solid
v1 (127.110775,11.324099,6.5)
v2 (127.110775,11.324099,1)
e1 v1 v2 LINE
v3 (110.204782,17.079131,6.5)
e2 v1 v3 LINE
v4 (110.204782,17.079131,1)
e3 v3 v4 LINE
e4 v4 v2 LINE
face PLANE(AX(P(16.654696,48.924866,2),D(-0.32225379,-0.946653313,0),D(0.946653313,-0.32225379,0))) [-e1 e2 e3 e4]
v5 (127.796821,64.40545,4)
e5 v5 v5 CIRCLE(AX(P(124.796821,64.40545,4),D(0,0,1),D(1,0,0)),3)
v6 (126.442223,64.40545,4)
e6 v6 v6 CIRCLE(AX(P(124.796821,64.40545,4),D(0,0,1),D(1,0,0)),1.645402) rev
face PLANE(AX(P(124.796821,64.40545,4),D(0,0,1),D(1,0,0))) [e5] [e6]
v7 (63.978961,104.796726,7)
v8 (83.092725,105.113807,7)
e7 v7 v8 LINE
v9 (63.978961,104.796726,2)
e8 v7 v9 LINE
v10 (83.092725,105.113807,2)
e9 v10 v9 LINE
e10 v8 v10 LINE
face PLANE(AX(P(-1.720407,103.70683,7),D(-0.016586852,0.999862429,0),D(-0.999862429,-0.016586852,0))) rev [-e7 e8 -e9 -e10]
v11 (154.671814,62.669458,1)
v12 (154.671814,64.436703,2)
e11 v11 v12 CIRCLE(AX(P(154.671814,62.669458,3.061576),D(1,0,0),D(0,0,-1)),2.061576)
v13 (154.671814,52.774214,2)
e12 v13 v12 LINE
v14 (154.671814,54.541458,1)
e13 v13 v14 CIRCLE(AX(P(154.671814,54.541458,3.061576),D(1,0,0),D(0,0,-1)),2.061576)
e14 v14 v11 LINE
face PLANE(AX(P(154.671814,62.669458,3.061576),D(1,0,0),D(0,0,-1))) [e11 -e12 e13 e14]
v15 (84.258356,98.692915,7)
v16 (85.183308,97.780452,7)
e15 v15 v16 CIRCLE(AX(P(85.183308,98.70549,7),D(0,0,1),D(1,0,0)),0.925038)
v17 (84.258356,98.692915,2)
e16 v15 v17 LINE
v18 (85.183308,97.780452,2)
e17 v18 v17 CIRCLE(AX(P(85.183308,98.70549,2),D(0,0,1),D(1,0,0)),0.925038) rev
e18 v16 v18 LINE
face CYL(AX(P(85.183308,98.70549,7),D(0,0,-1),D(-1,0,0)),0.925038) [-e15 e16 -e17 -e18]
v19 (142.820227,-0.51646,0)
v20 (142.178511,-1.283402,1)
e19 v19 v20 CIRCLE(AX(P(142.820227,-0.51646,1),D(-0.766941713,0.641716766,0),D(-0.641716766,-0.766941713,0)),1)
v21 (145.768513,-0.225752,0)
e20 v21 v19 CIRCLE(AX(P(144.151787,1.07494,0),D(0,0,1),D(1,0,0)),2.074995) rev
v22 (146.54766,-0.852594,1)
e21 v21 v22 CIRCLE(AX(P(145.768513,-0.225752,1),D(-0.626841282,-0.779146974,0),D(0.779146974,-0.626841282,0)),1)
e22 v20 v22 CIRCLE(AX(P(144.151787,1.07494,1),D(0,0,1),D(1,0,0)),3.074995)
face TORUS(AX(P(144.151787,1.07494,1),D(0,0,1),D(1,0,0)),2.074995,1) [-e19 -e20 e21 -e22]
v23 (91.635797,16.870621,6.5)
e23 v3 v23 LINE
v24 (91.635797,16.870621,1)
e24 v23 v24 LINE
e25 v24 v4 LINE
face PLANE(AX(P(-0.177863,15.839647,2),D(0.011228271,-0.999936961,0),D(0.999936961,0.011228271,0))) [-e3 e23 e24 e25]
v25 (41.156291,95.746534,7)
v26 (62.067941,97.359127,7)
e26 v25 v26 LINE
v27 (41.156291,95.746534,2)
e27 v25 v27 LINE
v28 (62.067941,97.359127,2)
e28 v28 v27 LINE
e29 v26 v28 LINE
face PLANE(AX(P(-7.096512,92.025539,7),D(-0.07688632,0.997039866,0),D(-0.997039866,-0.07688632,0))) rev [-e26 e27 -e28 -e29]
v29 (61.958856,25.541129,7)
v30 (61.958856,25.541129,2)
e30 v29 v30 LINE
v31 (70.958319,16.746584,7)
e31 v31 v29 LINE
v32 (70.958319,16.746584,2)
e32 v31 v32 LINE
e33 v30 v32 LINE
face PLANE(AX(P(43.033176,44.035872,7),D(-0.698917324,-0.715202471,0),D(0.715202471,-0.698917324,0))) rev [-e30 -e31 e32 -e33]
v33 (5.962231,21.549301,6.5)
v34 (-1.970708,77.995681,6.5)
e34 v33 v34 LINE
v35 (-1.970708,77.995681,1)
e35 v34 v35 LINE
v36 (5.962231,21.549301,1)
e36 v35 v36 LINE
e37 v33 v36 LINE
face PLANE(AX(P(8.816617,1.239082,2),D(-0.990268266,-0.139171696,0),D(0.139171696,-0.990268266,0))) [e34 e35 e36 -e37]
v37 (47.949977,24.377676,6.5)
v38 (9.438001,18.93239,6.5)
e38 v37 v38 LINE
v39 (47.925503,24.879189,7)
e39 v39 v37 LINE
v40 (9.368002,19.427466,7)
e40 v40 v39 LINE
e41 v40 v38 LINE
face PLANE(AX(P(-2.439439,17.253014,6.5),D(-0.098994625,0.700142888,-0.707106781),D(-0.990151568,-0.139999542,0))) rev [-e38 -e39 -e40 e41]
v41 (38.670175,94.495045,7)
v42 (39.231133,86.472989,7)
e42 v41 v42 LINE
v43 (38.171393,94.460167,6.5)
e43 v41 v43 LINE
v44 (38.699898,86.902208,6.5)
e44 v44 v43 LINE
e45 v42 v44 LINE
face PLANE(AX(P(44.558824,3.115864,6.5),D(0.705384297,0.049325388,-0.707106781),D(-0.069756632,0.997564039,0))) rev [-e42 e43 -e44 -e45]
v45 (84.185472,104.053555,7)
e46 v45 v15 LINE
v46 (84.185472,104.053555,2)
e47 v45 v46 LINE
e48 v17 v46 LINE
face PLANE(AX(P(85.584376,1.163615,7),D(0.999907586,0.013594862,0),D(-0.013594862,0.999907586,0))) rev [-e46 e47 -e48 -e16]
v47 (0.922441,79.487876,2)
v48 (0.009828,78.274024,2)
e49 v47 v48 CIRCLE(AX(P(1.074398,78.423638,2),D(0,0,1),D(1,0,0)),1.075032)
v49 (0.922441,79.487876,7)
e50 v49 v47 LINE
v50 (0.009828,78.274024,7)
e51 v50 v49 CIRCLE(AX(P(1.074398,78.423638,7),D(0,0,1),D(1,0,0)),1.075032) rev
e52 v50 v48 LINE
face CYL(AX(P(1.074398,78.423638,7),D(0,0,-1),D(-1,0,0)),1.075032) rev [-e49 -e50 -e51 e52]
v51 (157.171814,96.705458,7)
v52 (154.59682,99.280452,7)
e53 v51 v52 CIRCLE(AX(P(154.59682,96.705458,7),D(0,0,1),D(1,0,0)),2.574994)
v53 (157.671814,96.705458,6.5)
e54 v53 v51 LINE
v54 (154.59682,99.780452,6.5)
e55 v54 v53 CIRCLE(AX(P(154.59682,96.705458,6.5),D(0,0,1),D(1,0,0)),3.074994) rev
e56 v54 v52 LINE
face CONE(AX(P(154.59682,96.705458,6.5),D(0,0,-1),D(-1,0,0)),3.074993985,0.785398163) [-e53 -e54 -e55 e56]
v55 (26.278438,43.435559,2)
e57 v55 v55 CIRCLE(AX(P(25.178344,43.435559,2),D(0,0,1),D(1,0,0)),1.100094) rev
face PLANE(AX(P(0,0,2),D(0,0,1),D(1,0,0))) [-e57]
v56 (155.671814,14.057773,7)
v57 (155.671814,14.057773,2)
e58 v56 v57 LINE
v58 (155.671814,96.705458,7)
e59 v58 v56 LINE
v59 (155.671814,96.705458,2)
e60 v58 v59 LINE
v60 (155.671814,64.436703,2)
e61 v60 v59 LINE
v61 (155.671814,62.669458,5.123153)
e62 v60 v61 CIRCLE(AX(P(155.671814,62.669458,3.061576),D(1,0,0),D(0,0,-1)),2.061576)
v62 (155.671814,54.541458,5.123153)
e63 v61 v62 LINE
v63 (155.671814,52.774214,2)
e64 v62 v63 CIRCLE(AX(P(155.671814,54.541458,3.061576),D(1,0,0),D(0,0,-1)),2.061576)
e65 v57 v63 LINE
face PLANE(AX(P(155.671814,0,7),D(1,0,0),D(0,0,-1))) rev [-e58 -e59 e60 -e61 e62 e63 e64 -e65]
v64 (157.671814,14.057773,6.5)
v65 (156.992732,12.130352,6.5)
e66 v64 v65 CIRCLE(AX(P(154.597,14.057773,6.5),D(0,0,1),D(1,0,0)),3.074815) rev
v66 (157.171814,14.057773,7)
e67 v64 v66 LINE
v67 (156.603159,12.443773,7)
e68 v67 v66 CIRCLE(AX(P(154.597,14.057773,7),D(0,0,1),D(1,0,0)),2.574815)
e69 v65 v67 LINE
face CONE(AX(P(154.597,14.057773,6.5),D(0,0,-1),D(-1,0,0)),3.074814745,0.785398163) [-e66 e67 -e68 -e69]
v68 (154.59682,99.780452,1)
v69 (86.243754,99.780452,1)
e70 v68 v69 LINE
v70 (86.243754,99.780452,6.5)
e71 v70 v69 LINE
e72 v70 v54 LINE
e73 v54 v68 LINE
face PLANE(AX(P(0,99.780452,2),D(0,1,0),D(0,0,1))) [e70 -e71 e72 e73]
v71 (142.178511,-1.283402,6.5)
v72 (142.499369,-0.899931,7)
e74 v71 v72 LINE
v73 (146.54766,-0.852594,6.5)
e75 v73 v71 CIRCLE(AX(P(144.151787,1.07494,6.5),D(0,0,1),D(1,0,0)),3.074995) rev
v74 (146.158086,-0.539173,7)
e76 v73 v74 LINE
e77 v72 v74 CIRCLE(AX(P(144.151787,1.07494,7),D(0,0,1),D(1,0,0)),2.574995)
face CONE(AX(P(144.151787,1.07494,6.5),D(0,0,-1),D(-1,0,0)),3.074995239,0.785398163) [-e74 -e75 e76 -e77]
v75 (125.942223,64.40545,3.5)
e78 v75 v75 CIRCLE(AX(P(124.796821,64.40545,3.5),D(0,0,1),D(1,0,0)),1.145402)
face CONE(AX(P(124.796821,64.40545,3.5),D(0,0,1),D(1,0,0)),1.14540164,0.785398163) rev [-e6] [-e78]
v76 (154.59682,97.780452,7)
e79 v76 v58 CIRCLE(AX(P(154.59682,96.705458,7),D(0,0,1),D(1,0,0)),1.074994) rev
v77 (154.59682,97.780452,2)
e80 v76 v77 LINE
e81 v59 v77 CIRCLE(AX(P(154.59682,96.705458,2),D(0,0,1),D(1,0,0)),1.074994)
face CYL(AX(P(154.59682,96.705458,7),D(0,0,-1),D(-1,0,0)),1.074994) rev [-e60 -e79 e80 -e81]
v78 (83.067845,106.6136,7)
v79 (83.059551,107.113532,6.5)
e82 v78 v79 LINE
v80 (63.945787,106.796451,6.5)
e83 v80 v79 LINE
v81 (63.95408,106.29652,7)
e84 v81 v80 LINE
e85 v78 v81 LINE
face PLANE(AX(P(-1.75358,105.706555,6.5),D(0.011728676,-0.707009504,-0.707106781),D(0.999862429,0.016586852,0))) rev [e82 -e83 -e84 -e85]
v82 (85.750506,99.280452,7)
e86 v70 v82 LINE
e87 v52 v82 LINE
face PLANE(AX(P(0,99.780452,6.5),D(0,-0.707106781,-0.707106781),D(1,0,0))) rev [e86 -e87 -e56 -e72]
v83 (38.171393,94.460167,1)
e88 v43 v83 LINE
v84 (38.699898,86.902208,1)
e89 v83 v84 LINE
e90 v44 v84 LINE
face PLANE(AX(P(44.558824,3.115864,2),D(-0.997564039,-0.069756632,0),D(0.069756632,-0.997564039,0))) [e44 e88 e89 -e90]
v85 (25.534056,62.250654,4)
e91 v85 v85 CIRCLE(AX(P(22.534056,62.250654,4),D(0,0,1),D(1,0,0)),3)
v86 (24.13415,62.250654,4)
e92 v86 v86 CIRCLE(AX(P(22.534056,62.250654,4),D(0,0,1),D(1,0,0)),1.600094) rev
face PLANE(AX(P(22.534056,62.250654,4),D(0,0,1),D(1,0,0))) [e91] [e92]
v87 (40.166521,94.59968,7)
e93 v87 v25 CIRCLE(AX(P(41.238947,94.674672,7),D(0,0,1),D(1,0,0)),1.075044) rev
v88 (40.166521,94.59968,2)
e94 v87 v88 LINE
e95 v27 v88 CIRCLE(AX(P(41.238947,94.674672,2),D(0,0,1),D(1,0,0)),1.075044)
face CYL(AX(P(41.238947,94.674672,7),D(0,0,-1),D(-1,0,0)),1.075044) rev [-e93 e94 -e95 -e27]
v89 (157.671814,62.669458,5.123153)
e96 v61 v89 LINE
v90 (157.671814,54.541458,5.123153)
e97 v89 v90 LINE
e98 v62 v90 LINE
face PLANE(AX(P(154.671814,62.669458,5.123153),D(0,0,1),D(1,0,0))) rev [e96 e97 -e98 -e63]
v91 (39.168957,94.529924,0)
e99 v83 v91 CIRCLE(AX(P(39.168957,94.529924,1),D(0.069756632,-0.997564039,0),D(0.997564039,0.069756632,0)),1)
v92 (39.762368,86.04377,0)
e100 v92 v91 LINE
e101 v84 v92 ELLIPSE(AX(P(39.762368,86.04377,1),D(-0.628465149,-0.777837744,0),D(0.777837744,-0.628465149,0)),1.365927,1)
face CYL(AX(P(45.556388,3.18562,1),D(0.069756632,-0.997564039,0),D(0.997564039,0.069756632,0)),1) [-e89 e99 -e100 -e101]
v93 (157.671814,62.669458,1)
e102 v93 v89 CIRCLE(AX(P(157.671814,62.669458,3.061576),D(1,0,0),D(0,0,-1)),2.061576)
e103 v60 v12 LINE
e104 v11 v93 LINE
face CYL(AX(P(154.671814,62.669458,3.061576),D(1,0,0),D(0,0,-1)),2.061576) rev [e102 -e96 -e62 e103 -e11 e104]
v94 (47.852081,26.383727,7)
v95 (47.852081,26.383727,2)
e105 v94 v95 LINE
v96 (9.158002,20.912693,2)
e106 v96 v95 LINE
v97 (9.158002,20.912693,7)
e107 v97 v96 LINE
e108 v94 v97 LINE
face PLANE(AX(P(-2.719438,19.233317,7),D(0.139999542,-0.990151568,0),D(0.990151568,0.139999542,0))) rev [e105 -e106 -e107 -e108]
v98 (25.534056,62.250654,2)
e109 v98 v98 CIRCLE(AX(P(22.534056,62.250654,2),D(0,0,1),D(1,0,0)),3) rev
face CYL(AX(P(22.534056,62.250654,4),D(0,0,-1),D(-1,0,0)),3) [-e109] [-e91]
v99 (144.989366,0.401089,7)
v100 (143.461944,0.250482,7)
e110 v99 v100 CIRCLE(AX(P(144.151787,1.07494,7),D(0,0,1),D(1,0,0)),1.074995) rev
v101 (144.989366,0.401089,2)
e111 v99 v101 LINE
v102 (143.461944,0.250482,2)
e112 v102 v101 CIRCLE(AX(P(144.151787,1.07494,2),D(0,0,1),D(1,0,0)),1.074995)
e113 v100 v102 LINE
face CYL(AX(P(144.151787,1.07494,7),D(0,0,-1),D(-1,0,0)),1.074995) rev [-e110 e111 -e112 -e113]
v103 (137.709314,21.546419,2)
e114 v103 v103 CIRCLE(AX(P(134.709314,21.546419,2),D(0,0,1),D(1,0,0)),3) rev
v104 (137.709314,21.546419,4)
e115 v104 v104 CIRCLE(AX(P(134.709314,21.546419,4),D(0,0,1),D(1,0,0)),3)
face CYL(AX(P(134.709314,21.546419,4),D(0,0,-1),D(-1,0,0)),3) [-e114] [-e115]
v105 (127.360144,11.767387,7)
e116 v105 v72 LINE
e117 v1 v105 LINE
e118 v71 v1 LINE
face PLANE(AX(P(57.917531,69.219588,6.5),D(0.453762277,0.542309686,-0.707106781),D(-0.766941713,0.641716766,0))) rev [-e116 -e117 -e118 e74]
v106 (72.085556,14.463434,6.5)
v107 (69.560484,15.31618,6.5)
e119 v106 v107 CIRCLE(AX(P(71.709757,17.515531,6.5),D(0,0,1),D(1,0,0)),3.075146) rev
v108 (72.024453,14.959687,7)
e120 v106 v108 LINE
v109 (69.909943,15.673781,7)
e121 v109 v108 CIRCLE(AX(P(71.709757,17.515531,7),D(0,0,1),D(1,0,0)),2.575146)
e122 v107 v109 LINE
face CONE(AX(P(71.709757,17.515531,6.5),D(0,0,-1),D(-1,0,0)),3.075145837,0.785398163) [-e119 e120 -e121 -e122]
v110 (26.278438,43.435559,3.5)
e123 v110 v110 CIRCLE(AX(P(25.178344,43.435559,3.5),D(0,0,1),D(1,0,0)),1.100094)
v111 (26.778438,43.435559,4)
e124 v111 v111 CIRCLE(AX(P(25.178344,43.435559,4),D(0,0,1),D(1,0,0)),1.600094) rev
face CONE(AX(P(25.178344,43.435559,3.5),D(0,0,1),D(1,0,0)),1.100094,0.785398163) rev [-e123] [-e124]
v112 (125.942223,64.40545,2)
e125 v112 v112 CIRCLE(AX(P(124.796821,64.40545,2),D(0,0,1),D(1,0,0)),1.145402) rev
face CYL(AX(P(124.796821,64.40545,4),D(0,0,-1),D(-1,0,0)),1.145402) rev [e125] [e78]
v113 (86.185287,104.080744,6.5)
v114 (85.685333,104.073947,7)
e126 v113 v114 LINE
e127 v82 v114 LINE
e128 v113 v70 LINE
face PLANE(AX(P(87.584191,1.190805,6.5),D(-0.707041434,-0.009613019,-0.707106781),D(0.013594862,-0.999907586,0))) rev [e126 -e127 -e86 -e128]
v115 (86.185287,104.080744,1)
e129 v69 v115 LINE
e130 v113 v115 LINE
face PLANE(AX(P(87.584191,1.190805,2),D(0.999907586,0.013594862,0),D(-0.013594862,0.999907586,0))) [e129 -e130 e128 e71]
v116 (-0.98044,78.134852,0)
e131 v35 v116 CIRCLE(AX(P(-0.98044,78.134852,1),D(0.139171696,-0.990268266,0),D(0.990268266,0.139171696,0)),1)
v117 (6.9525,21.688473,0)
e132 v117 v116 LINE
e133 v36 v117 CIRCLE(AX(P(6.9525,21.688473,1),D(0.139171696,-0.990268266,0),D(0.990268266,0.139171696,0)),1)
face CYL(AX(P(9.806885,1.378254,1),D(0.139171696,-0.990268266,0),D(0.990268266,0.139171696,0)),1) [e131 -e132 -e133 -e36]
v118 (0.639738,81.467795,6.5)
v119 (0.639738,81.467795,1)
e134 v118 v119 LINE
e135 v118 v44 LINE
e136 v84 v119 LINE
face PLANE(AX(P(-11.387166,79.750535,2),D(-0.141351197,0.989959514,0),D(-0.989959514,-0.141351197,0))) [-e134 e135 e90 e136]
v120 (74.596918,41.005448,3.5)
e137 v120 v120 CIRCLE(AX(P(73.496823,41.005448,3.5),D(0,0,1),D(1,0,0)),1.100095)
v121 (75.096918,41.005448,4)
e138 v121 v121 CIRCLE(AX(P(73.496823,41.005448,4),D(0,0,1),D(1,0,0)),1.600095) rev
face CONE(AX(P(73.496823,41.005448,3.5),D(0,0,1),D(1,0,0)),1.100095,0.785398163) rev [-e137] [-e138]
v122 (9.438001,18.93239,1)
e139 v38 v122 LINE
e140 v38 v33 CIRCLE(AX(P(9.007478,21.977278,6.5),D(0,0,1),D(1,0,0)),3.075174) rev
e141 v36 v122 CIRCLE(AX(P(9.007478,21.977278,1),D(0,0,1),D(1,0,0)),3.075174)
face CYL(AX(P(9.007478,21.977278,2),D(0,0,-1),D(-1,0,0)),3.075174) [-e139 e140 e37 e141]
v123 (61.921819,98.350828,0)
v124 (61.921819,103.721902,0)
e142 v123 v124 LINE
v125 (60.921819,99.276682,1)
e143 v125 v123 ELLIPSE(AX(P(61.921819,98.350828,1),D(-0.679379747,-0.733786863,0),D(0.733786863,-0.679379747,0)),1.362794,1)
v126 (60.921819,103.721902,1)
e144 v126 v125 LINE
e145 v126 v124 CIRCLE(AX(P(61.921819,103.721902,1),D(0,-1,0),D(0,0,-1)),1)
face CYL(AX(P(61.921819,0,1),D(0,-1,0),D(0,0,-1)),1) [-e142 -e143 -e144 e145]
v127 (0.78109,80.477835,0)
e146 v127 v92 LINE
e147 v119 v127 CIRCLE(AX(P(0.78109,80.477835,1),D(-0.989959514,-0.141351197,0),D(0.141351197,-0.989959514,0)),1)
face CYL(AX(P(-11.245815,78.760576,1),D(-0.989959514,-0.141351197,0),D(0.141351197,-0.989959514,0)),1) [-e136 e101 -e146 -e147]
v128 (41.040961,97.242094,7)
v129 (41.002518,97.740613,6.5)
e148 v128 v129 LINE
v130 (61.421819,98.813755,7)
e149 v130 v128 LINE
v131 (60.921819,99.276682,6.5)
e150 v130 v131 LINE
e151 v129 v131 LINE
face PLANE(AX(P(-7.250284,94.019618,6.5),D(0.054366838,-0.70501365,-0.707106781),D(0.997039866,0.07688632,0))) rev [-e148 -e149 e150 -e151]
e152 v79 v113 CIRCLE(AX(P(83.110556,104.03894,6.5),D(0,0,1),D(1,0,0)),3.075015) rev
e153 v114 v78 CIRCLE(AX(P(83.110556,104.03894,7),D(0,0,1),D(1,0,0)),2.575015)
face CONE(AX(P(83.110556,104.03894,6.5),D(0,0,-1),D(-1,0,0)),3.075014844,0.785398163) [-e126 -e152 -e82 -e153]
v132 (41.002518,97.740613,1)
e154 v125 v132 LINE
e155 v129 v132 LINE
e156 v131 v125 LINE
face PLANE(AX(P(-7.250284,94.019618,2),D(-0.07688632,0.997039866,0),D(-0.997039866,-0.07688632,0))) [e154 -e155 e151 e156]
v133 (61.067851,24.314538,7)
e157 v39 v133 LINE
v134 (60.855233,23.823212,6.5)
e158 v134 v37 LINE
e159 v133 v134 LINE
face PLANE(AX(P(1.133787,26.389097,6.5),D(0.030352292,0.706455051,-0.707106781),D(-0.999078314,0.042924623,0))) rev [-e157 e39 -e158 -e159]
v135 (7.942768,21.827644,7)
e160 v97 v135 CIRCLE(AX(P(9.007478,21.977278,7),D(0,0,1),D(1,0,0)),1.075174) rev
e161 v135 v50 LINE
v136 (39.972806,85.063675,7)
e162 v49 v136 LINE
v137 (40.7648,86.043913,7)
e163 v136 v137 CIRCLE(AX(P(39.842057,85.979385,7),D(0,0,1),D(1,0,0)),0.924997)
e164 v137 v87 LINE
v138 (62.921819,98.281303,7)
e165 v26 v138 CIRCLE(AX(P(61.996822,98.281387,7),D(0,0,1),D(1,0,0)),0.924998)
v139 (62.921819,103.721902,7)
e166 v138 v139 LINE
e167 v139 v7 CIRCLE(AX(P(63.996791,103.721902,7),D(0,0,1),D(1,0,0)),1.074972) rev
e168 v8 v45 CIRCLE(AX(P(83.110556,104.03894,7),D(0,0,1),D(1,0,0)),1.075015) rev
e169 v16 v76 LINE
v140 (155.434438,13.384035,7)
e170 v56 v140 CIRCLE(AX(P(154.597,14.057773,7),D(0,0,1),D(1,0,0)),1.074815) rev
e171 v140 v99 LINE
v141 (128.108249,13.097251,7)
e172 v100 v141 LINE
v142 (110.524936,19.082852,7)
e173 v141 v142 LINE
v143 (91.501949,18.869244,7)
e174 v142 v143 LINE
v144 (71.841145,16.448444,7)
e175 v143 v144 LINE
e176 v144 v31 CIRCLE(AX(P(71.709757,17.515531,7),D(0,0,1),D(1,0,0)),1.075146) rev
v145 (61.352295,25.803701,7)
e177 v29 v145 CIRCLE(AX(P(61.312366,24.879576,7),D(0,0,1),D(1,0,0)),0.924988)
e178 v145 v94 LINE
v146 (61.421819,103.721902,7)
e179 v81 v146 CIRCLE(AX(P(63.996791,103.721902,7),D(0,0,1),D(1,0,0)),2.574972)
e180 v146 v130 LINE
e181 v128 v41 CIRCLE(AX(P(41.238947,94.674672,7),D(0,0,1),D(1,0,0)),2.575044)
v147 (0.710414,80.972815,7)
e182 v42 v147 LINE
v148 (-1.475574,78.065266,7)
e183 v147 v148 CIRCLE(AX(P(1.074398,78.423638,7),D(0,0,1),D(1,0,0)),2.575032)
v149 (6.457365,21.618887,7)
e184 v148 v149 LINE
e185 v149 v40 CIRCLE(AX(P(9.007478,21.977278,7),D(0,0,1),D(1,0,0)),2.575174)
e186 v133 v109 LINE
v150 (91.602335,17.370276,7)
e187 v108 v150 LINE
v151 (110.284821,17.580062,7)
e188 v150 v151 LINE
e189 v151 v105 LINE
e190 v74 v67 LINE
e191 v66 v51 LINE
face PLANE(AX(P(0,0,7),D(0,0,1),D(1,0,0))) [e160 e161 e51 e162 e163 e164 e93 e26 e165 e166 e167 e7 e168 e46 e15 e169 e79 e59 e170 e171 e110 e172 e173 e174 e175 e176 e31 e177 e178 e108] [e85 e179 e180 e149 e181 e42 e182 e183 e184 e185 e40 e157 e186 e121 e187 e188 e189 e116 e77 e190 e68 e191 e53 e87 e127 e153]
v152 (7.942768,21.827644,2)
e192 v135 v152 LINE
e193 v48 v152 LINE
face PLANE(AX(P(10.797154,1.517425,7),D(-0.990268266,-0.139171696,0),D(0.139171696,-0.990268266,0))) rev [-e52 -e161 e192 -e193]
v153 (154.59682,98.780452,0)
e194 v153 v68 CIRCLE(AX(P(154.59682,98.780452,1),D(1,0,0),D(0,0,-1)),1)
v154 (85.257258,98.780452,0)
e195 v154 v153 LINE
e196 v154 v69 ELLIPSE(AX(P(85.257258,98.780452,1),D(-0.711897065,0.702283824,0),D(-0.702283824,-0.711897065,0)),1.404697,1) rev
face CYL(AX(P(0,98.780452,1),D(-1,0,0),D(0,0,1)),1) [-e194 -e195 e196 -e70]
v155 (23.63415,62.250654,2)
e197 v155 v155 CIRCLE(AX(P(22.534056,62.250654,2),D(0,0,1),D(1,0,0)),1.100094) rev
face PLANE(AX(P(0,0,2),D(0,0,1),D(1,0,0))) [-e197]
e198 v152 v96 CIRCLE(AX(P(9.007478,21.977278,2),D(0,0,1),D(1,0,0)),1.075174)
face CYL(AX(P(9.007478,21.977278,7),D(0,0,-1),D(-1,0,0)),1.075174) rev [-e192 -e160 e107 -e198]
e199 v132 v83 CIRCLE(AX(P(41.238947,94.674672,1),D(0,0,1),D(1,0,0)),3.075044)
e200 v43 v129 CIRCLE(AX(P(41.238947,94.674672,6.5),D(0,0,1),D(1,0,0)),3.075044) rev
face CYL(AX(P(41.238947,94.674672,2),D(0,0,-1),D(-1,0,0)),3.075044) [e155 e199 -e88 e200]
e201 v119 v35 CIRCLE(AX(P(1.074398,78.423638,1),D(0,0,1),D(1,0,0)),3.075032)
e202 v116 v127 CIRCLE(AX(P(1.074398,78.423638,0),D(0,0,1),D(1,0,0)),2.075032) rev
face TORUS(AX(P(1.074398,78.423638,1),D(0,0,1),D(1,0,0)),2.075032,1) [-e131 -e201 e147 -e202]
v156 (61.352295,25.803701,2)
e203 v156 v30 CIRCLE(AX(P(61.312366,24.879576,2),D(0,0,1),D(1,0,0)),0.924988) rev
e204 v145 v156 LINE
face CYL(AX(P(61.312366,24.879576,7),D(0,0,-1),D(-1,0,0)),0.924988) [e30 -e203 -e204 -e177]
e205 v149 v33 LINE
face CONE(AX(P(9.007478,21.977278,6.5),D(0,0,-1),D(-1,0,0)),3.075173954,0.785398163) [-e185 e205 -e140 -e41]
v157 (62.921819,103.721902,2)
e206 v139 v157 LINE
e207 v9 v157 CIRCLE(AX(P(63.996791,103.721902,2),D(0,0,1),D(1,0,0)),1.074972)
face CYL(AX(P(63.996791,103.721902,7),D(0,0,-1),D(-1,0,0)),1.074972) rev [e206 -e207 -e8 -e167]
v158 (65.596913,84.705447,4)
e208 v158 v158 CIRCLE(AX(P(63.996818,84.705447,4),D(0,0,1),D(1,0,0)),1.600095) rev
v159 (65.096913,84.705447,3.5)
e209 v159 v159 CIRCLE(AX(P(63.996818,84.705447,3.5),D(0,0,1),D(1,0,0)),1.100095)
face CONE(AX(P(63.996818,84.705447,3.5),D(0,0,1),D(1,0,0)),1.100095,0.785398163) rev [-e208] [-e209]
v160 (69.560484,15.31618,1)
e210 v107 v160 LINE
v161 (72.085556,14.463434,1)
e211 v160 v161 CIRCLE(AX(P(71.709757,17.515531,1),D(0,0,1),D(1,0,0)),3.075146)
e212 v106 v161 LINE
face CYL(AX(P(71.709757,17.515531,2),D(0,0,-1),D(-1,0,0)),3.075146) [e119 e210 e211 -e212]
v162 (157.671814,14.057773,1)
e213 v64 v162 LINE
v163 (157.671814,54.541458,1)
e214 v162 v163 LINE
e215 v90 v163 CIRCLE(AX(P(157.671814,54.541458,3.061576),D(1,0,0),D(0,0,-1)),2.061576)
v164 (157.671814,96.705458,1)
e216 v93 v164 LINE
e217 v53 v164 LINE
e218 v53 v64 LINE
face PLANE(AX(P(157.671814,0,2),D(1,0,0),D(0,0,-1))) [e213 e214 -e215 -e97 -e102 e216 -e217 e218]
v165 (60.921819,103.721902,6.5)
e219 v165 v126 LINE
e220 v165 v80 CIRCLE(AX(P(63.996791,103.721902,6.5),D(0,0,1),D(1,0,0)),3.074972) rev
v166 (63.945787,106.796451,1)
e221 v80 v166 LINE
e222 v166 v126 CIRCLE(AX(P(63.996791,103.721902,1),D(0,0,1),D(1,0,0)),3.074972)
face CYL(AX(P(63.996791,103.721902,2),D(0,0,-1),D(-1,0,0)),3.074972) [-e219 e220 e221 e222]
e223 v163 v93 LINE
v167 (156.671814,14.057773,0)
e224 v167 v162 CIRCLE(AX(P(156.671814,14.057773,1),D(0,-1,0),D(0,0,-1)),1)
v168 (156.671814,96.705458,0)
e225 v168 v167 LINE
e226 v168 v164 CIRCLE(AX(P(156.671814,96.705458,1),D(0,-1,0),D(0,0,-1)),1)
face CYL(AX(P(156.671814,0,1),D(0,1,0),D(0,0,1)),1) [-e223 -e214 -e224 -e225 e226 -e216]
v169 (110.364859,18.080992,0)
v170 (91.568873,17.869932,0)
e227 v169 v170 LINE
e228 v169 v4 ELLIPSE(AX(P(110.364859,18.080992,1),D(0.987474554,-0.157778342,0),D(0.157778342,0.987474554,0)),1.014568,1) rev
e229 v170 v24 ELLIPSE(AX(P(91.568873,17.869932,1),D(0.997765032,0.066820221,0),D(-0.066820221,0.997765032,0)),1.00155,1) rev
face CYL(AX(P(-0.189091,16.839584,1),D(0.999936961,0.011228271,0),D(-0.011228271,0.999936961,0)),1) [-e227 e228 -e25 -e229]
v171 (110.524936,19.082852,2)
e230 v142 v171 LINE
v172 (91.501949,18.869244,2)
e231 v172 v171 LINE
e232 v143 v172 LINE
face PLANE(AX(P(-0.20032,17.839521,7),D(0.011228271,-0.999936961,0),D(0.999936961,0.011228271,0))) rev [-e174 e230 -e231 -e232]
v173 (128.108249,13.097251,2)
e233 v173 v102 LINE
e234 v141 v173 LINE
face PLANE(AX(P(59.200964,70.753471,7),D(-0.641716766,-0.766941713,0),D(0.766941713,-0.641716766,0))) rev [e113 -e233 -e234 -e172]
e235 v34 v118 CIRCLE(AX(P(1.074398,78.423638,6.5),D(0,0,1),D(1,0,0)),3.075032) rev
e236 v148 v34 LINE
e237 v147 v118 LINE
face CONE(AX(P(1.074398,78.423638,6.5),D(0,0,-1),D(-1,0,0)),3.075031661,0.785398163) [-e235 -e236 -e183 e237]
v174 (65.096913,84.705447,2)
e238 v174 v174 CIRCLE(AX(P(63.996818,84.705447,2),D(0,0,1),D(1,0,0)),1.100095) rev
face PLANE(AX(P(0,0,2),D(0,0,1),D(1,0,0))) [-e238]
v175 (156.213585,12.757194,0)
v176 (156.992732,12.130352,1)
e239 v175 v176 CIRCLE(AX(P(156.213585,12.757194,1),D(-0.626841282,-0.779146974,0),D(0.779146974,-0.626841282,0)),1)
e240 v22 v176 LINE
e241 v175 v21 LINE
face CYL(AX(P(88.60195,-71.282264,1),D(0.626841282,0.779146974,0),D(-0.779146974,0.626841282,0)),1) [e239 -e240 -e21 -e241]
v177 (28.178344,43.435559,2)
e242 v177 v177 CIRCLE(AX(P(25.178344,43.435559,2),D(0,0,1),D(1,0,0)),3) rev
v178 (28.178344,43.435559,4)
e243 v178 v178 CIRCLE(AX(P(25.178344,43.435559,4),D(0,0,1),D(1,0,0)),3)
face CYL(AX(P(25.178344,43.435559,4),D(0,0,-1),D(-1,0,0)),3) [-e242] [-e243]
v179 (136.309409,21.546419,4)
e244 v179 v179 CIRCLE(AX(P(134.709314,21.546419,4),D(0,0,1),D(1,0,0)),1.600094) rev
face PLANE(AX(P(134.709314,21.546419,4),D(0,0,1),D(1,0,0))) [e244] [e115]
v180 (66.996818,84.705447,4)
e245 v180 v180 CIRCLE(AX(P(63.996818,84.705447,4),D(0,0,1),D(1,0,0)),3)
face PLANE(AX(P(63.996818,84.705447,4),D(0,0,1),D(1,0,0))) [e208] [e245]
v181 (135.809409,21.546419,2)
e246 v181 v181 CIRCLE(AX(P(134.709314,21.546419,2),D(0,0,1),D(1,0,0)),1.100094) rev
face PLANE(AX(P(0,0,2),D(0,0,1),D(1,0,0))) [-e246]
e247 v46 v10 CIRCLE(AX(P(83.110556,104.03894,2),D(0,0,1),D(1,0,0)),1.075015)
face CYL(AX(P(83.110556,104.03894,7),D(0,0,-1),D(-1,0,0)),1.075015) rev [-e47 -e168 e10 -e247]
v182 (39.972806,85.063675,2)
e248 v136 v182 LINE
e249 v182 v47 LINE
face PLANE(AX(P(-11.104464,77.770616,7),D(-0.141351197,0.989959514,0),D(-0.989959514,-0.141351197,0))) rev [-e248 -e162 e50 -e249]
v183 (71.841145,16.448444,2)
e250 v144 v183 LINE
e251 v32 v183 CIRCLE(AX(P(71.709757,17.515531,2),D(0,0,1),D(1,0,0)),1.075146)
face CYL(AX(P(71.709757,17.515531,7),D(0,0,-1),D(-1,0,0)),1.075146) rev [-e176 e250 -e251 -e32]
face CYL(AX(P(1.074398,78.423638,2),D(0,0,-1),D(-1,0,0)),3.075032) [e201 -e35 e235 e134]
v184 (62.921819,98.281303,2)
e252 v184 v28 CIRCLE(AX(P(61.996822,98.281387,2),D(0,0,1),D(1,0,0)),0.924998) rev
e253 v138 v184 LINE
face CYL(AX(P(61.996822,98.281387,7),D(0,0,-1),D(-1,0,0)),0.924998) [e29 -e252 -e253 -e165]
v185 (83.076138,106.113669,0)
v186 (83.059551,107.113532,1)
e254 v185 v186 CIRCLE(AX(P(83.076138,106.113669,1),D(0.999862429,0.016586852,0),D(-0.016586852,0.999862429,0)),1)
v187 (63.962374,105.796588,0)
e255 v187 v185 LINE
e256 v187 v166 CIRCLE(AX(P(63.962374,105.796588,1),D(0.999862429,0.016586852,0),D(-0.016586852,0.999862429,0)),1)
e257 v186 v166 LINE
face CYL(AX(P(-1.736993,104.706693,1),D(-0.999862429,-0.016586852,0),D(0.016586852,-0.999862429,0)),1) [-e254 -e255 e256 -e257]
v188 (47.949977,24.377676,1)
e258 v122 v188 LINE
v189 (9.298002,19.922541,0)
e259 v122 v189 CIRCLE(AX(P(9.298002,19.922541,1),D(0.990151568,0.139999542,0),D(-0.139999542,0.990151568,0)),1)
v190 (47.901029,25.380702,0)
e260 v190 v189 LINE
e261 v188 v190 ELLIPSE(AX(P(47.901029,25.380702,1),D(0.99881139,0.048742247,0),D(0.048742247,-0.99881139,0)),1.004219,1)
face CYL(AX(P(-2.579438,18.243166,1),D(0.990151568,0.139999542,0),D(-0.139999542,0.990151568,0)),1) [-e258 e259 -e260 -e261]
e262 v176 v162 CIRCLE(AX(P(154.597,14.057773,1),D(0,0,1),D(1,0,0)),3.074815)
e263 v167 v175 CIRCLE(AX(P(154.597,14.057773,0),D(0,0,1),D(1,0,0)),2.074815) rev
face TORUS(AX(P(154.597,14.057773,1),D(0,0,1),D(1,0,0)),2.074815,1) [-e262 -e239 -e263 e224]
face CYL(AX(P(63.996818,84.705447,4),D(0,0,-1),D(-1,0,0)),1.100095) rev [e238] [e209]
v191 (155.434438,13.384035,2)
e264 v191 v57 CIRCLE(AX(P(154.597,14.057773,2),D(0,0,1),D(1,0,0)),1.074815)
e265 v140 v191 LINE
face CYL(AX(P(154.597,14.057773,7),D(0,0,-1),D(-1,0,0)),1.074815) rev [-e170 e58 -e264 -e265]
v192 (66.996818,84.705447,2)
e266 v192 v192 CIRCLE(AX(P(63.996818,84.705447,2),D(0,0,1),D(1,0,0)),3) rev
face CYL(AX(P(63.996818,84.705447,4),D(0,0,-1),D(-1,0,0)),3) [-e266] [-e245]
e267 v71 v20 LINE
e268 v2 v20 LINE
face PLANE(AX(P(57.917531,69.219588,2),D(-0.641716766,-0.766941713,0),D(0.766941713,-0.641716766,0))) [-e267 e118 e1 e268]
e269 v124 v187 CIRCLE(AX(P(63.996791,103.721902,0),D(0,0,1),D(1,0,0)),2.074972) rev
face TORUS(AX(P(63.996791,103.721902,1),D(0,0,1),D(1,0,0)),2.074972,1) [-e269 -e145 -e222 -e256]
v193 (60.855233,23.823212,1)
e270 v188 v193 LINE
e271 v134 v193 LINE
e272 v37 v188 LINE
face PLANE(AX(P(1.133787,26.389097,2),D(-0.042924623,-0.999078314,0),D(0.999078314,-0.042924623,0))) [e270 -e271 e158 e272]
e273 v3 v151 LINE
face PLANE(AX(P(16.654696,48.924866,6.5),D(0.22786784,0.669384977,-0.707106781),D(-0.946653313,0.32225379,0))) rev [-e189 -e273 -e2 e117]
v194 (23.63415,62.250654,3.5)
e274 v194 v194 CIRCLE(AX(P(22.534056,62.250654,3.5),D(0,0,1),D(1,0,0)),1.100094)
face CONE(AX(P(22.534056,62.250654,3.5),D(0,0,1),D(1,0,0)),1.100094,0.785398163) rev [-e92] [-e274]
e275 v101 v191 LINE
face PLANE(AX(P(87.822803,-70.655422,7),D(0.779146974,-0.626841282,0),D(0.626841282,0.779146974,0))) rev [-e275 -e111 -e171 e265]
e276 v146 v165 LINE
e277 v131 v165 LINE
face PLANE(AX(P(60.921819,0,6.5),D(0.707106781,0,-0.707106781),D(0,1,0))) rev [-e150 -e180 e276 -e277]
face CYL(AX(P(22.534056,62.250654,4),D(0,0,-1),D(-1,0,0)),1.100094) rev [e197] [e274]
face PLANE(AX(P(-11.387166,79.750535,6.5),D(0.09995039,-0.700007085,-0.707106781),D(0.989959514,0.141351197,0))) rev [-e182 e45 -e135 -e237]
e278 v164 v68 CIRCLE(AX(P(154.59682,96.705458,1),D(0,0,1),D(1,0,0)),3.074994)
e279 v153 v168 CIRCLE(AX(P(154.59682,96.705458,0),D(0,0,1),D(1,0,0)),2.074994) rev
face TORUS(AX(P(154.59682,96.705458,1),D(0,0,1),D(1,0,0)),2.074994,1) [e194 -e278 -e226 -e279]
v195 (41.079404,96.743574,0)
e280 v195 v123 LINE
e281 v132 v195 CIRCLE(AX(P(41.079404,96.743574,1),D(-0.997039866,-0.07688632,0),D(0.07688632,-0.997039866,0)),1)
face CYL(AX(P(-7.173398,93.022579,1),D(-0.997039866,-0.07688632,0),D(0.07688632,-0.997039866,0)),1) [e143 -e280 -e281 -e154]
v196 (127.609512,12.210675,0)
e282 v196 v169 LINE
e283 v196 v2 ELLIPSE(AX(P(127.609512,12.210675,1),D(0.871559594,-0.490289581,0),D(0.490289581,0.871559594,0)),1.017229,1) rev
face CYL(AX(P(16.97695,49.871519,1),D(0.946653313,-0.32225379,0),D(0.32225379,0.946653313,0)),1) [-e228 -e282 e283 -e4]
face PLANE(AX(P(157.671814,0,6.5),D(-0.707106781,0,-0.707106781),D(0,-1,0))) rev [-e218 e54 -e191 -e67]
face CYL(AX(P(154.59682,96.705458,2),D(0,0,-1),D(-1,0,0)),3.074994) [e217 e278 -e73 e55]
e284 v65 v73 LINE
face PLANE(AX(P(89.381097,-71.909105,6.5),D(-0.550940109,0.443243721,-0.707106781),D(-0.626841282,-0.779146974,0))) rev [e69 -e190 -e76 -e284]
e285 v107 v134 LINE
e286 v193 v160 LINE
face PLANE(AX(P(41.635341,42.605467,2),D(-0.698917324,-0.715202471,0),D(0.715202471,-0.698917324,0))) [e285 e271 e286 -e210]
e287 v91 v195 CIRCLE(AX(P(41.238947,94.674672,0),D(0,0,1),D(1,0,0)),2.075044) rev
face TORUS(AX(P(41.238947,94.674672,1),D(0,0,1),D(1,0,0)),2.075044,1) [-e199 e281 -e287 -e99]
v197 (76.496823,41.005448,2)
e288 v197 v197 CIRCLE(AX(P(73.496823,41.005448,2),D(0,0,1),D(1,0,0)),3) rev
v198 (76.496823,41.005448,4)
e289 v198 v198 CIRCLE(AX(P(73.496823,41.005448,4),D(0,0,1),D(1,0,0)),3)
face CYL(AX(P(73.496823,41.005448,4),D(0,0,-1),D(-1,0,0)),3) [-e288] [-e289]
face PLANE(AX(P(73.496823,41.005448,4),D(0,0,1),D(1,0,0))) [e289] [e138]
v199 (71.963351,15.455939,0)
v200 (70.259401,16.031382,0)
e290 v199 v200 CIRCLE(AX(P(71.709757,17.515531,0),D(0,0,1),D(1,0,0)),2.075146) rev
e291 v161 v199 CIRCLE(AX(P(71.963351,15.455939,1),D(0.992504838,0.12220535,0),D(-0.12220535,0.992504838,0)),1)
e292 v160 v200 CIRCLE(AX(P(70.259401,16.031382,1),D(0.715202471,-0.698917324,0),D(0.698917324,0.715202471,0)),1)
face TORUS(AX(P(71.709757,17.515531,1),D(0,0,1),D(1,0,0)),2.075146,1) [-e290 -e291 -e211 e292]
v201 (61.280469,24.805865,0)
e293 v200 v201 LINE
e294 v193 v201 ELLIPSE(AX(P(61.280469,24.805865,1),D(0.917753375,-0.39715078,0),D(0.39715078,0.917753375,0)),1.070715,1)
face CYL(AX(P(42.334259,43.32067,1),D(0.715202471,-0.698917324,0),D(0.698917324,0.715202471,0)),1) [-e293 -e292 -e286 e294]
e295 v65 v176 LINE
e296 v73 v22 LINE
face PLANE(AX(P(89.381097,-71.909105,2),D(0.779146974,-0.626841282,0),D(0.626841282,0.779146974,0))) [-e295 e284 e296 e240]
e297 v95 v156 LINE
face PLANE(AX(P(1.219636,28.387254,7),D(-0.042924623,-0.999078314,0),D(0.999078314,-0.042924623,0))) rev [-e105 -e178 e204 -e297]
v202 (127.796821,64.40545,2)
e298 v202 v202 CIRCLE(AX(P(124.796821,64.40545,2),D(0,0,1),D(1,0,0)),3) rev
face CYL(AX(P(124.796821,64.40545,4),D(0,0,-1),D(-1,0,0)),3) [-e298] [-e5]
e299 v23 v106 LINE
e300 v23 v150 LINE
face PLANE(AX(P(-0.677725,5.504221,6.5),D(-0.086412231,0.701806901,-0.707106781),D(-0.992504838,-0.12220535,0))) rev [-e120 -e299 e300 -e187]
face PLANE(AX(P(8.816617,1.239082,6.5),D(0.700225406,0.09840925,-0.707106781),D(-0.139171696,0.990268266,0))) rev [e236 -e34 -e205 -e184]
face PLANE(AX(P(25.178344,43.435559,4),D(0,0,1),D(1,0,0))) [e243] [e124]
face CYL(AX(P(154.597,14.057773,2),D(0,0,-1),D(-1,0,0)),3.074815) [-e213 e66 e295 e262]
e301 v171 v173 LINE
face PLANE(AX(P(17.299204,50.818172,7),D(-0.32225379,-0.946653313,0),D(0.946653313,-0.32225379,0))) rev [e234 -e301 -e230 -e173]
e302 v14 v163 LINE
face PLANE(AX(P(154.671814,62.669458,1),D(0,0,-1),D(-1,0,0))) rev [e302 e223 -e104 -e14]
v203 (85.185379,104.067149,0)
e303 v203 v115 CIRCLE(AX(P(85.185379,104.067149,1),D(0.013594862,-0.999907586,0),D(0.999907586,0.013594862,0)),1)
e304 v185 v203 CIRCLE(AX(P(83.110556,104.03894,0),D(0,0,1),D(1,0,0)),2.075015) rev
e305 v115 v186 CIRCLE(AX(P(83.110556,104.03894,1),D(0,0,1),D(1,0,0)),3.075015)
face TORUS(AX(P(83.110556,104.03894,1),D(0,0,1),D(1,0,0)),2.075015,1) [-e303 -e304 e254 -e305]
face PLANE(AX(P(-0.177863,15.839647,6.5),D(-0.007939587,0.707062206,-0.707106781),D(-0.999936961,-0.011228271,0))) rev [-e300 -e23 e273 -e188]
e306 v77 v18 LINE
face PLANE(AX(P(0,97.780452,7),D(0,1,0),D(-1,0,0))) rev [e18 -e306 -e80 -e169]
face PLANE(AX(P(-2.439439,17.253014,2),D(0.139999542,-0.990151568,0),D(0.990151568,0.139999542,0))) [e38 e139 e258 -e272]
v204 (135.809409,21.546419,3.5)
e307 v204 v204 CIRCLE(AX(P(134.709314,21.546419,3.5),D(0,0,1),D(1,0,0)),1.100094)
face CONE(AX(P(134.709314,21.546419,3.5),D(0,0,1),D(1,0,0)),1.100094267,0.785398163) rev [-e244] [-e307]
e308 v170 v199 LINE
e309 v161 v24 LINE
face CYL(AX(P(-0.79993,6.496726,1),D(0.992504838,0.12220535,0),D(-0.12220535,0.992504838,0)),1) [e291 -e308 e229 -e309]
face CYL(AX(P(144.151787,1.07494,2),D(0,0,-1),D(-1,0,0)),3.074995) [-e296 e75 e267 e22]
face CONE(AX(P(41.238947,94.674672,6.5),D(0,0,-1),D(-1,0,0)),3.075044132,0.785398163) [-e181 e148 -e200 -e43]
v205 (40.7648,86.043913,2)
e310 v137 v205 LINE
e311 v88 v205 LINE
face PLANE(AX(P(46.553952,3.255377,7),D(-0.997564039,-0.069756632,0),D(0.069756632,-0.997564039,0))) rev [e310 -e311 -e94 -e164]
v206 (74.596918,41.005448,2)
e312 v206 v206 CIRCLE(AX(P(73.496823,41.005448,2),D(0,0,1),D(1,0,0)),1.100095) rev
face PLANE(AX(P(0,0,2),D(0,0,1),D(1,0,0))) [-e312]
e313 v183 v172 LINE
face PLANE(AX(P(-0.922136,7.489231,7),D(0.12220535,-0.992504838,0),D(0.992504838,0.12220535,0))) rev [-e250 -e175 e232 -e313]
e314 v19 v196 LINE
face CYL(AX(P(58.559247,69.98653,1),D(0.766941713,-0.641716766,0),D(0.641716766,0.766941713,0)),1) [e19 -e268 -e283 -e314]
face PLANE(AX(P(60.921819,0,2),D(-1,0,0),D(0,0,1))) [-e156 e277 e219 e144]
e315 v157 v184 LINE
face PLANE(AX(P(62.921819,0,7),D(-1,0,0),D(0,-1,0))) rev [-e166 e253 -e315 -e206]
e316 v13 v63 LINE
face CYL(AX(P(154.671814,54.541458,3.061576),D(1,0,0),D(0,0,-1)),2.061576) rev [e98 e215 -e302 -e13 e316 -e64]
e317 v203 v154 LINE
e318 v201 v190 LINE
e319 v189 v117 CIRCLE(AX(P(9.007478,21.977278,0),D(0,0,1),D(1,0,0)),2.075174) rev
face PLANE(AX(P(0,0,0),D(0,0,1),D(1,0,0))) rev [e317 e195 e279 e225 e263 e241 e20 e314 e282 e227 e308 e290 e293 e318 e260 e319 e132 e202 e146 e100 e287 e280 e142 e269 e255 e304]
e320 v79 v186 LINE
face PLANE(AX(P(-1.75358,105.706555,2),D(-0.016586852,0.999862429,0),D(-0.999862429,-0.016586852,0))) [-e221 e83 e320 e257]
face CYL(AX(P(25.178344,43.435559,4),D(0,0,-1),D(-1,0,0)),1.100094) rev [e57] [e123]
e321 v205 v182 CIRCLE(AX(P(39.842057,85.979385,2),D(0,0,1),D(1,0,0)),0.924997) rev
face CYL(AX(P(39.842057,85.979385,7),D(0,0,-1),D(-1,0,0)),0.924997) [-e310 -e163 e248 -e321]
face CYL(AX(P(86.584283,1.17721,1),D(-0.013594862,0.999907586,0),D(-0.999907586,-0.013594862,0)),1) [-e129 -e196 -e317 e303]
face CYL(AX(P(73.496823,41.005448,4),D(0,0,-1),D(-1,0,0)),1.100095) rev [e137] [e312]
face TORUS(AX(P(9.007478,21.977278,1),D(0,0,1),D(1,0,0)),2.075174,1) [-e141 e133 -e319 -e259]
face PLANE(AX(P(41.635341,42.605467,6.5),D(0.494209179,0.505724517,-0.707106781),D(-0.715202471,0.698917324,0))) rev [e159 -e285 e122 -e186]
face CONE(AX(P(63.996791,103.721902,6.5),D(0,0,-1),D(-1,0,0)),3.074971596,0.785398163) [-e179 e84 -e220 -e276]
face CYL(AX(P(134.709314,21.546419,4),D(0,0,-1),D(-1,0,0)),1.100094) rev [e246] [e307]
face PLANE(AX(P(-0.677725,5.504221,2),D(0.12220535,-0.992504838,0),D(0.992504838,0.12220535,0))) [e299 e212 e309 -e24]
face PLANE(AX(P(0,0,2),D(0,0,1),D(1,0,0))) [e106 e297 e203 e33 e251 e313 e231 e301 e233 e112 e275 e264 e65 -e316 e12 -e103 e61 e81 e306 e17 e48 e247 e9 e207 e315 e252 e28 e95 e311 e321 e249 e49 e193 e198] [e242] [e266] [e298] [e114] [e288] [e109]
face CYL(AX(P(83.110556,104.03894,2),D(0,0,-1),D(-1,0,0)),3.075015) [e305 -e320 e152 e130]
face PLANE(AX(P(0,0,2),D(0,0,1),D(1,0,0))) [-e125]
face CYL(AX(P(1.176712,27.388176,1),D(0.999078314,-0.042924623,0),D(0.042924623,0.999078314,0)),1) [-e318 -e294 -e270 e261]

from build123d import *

# Parameters (mm, degrees)
BOSS_EXTRUDE1_DEPTH = 2
BOSS_EXTRUDE2_DEPTH = 7
SKETCH7_R           = 3
SKETCH7_R_2         = 1.100094
SKETCH7_R_3         = 1.100095
SKETCH7_R_4         = 1.14540164
SKETCH7_R_5         = 1.100094267
BOSS_EXTRUDE3_DEPTH = 4
CUT_EXTRUDE1_DEPTH  = 3
FILLET2_R           = 1
CHAMFER1_SIZE       = 0.5
CHAMFER2_SIZE       = 0.5


with BuildPart() as part:
    # Sketch3 → Boss-Extrude1 (new body)
    with BuildSketch(Plane.XY):
        with BuildLine():
            Line((60.855233133, 23.823211938), (47.949977192, 24.377676222))
            Line((47.949977192, 24.377676222), (9.438001399, 18.932389733))
            ThreePointArc((9.438001399, 18.932389733), (7.157815869, 19.520564151), (5.962231275, 21.549300871))
            Line((5.962231275, 21.549300871), (-1.970708405, 77.995680607))
            ThreePointArc((-1.970708405, 77.995680607), (-1.383464331, 80.271537635), (0.639738461, 81.467794829))
            Line((0.639738461, 81.467794829), (38.699898469, 86.902208152))
            Line((38.699898469, 86.902208152), (38.171393284, 94.460167157))
            ThreePointArc((38.171393284, 94.460167157), (38.910984807, 96.683773594), (41.002517903, 97.740613468))
            Line((41.002517903, 97.740613468), (60.921819416, 99.276682226))
            Line((60.921819416, 99.276682226), (60.921819416, 103.721902307))
            ThreePointArc((60.921819416, 103.721902307), (61.804499235, 105.878127499), (63.945786912, 106.796450874))
            Line((63.945786912, 106.796450874), (83.059551455, 107.113531682))
            ThreePointArc((83.059551455, 107.113531682), (85.251859467, 106.245869167), (86.185286941, 104.080744272))
            Line((86.185286941, 104.080744272), (86.24375422, 99.780452187))
            Line((86.24375422, 99.780452187), (154.596820419, 99.780452187))
            ThreePointArc((154.596820419, 99.780452187), (156.771169517, 98.879807301), (157.671814403, 96.705458202))
            Line((157.671814403, 96.705458202), (157.671814403, 14.057773112))
            ThreePointArc((157.671814403, 14.057773112), (157.497078938, 13.035997261), (156.992732263, 12.130352296))
            Line((156.992732263, 12.130352296), (146.547659954, -0.852593653))
            ThreePointArc((146.547659954, -0.852593653), (144.453525054, -1.98521487), (142.178510717, -1.283401812))
            Line((142.178510717, -1.283401812), (127.110775499, 11.324099062))
            Line((127.110775499, 11.324099062), (110.204782414, 17.079131321))
            Line((110.204782414, 17.079131321), (91.635796855, 16.870620568))
            Line((91.635796855, 16.870620568), (72.085555936, 14.46343429))
            ThreePointArc((72.085555936, 14.46343429), (70.725838171, 14.602041008), (69.560483965, 15.316179508))
            Line((69.560483965, 15.316179508), (60.855233133, 23.823211938))
        make_face()
    extrude(amount=BOSS_EXTRUDE1_DEPTH)

    # Sketch4 → Boss-Extrude2 (add)
    with BuildSketch(Plane.XY):
        with BuildLine():
            Line((47.949977192, 24.377676222), (60.855233133, 23.823211938))
            Line((60.855233133, 23.823211938), (69.560483965, 15.316179508))
            ThreePointArc((69.560483965, 15.316179508), (70.725838171, 14.602041008), (72.085555936, 14.46343429))
            Line((72.085555936, 14.46343429), (91.635796855, 16.870620568))
            Line((91.635796855, 16.870620568), (110.204782414, 17.079131321))
            Line((110.204782414, 17.079131321), (127.110775499, 11.324099062))
            Line((127.110775499, 11.324099062), (142.178510717, -1.283401812))
            ThreePointArc((142.178510717, -1.283401812), (144.453525054, -1.98521487), (146.547659954, -0.852593653))
            Line((146.547659954, -0.852593653), (156.992732263, 12.130352296))
            ThreePointArc((156.992732263, 12.130352296), (157.497078938, 13.035997261), (157.671814403, 14.057773112))
            Line((157.671814403, 14.057773112), (157.671814403, 96.705458202))
            ThreePointArc((157.671814403, 96.705458202), (156.771169517, 98.879807301), (154.596820419, 99.780452187))
            Line((154.596820419, 99.780452187), (86.24375422, 99.780452187))
            Line((86.24375422, 99.780452187), (86.185286941, 104.080744272))
            ThreePointArc((86.185286941, 104.080744272), (85.251859467, 106.245869167), (83.059551455, 107.113531682))
            Line((83.059551455, 107.113531682), (63.945786912, 106.796450874))
            ThreePointArc((63.945786912, 106.796450874), (61.804499235, 105.878127499), (60.921819416, 103.721902307))
            Line((60.921819416, 103.721902307), (60.921819416, 99.276682226))
            Line((60.921819416, 99.276682226), (41.002517903, 97.740613468))
            ThreePointArc((41.002517903, 97.740613468), (38.910984807, 96.683773594), (38.171393284, 94.460167157))
            Line((38.171393284, 94.460167157), (38.699898469, 86.902208152))
            Line((38.699898469, 86.902208152), (0.639738461, 81.467794829))
            ThreePointArc((0.639738461, 81.467794829), (-1.383464331, 80.271537635), (-1.970708405, 77.995680607))
            Line((-1.970708405, 77.995680607), (5.962231275, 21.549300871))
            ThreePointArc((5.962231275, 21.549300871), (7.157815869, 19.520564151), (9.438001399, 18.932389733))
            Line((9.438001399, 18.932389733), (47.949977192, 24.377676222))
        make_face()
        with BuildLine():
            ThreePointArc((84.258355662, 98.692914663), (84.533669024, 98.04695842), (85.183308419, 97.780452187))
            Line((85.183308419, 97.780452187), (154.596820419, 97.780452187))
            ThreePointArc((154.596820419, 97.780452187), (155.356955955, 97.465593738), (155.671814403, 96.705458202))
            Line((155.671814403, 96.705458202), (155.671814403, 14.057773112))
            ThreePointArc((155.671814403, 14.057773112), (155.610734868, 13.70060696), (155.434438315, 13.38403486))
            Line((155.434438315, 13.38403486), (144.989366006, 0.401088911))
            ThreePointArc((144.989366006, 0.401088911), (144.257272174, 0.005133041), (143.461944249, 0.250481615))
            Line((143.461944249, 0.250481615), (128.108249423, 13.097251096))
            Line((128.108249423, 13.097251096), (110.524936275, 19.082852408))
            Line((110.524936275, 19.082852408), (91.501949272, 18.869243682))
            Line((91.501949272, 18.869243682), (71.841145237, 16.448443965))
            ThreePointArc((71.841145237, 16.448443965), (71.365754809, 16.496904248), (70.958318613, 16.74658445))
            Line((70.958318613, 16.74658445), (61.958856362, 25.54112911))
            ThreePointArc((61.958856362, 25.54112911), (61.679828995, 25.728441638), (61.352295386, 25.803701118))
            Line((61.352295386, 25.803701118), (47.852081394, 26.383727313))
            Line((47.852081394, 26.383727313), (9.158002316, 20.91269287))
            ThreePointArc((9.158002316, 20.91269287), (8.360780393, 21.118336461), (7.942767807, 21.827644264))
            Line((7.942767807, 21.827644264), (0.009828128, 78.274024))
            ThreePointArc((0.009828128, 78.274024), (0.215128769, 79.069664055), (0.922440855, 79.487875801))
            Line((0.922440855, 79.487875801), (39.972806225, 85.063675424))
            ThreePointArc((39.972806225, 85.063675424), (40.561555536, 85.398058084), (40.76480024, 86.043913413))
            Line((40.76480024, 86.043913413), (40.166521363, 94.599680421))
            ThreePointArc((40.166521363, 94.599680421), (40.425084652, 95.377059525), (41.156290542, 95.746533736))
            Line((41.156290542, 95.746533736), (62.067941403, 97.359127107))
            ThreePointArc((62.067941403, 97.359127107), (62.675544492, 97.652931317), (62.921819416, 98.281303094))
            Line((62.921819416, 98.281303094), (62.921819416, 103.721902307))
            ThreePointArc((62.921819416, 103.721902307), (63.230393236, 104.475691655), (63.978960617, 104.796726017))
            Line((63.978960617, 104.796726017), (83.09272516, 105.113806824))
            ThreePointArc((83.09272516, 105.113806824), (83.859148665, 104.810474928), (84.185471769, 104.053554549))
            Line((84.185471769, 104.053554549), (84.258355662, 98.692914663))
        make_face(mode=Mode.SUBTRACT)
    extrude(amount=BOSS_EXTRUDE2_DEPTH)

    # Sketch7 → Boss-Extrude3 (add)
    # profile 1 of 6: a face of its own
    with BuildSketch(Plane.XY):
        with Locations((25.178343626, 43.435558637)):
            Circle(SKETCH7_R)
        with Locations((25.178343626, 43.435558637)):
            Circle(SKETCH7_R_2, mode=Mode.SUBTRACT)
    # profile 2 of 6: a face of its own
    with BuildSketch(Plane.XY):
        with Locations((22.534055897, 62.250653675)):
            Circle(SKETCH7_R)
        with Locations((22.534055897, 62.250653675)):
            Circle(SKETCH7_R_2, mode=Mode.SUBTRACT)
    # profile 3 of 6: a face of its own
    with BuildSketch(Plane.XY):
        with Locations((63.99681822, 84.705447078)):
            Circle(SKETCH7_R)
        with Locations((63.99681822, 84.705447078)):
            Circle(SKETCH7_R_3, mode=Mode.SUBTRACT)
    # profile 4 of 6: a face of its own
    with BuildSketch(Plane.XY):
        with Locations((73.496822591, 41.005447941)):
            Circle(SKETCH7_R)
        with Locations((73.496822591, 41.005447941)):
            Circle(SKETCH7_R_3, mode=Mode.SUBTRACT)
    # profile 5 of 6: a face of its own
    with BuildSketch(Plane.XY):
        with Locations((124.796820928, 64.405450202)):
            Circle(SKETCH7_R)
        with Locations((124.796820928, 64.405450202)):
            Circle(SKETCH7_R_4, mode=Mode.SUBTRACT)
    # profile 6 of 6: a face of its own
    with BuildSketch(Plane.XY):
        with Locations((134.70931431, 21.546419059)):
            Circle(SKETCH7_R)
        with Locations((134.70931431, 21.546419059)):
            Circle(SKETCH7_R_5, mode=Mode.SUBTRACT)
    extrude(amount=BOSS_EXTRUDE3_DEPTH)

    # Sketch8 → Cut-Extrude1 (cut)
    with BuildSketch(Plane(origin=(157.671814403, 0, 0), x_dir=(0, 0, -1), z_dir=(1, 0, 0))):
        with BuildLine():
            Line((-1, 62.669458202), (-1, 54.541458202))
            ThreePointArc((-1, 54.541458202), (-3.061576359, 52.479881843), (-5.123152718, 54.541458202))
            Line((-5.123152718, 54.541458202), (-5.123152718, 62.669458202))
            ThreePointArc((-5.123152718, 62.669458202), (-3.061576359, 64.731034561), (-1, 62.669458202))
        make_face()
    extrude(amount=-CUT_EXTRUDE1_DEPTH, mode=Mode.SUBTRACT)

    # Fillet2
    fillet2_edges = [part.edges().sort_by_distance(p)[0] for p in [
        (65.207858549, 19.569695723, 0),
        (54.402605163, 24.10044408, 0),
        (28.693989296, 21.655032978, 0),
        (7.157815869, 19.520564151, 0),
        (1.995761435, 49.772490739, 0),
        (-1.383464331, 80.271537635, 0),
        (19.669818465, 84.18500149, 0),
        (38.435645877, 90.681187654, 0),
        (38.910984807, 96.683773594, 0),
        (50.962168659, 98.508647847, 0),
        (60.921819416, 101.499292266, 0),
        (61.804499235, 105.878127499, 0),
        (73.502669184, 106.954991278, 0),
        (85.251859467, 106.245869167, 0),
        (86.21452058, 101.930598229, 0),
        (120.420287319, 99.780452187, 0),
        (156.771169517, 98.879807301, 0),
        (157.671814403, 55.381615657, 0),
        (157.497078938, 13.035997261, 0),
        (151.770196108, 5.638879321, 0),
        (144.453525054, -1.98521487, 0),
        (134.644643108, 5.020348625, 0),
        (118.657778957, 14.201615191, 0),
        (100.920289635, 16.974875944, 0),
        (81.860676395, 15.667027429, 0),
        (70.725838171, 14.602041008, 0),
    ]]
    fillet(fillet2_edges, radius=FILLET2_R - 0.0001)  # a hair under: the kernel refuses the full size

    # Chamfer1
    chamfer1_edges = [part.edges().sort_by_distance(p)[0] for p in [
        (70.725838171, 14.602041008, 7),
        (81.860676395, 15.667027429, 7),
        (100.920289635, 16.974875944, 7),
        (118.657778957, 14.201615191, 7),
        (134.644643108, 5.020348625, 7),
        (144.453525054, -1.98521487, 7),
        (151.770196108, 5.638879321, 7),
        (157.497078938, 13.035997261, 7),
        (157.671814403, 55.381615657, 7),
        (156.771169517, 98.879807301, 7),
        (120.420287319, 99.780452187, 7),
        (86.21452058, 101.930598229, 7),
        (85.251859467, 106.245869167, 7),
        (73.502669184, 106.954991278, 7),
        (61.804499235, 105.878127499, 7),
        (60.921819416, 101.499292266, 7),
        (50.962168659, 98.508647847, 7),
        (38.910984807, 96.683773594, 7),
        (38.435645877, 90.681187654, 7),
        (19.669818465, 84.18500149, 7),
        (-1.383464331, 80.271537635, 7),
        (1.995761435, 49.772490739, 7),
        (7.157815869, 19.520564151, 7),
        (28.693989296, 21.655032978, 7),
        (54.402605163, 24.10044408, 7),
        (65.207858549, 19.569695723, 7),
    ]]
    chamfer(chamfer1_edges, length=CHAMFER1_SIZE)

    # Chamfer2
    chamfer2_edges = [part.edges().sort_by_distance(p)[0] for p in [
        (133.609220043, 21.546419059, 4),
        (123.651419288, 64.405450202, 4),
        (72.396727591, 41.005447941, 4),
        (62.89672322, 84.705447078, 4),
        (21.433961897, 62.250653675, 4),
        (24.078249626, 43.435558637, 4),
    ]]
    chamfer(chamfer2_edges, length=CHAMFER2_SIZE)


solid = part.part
